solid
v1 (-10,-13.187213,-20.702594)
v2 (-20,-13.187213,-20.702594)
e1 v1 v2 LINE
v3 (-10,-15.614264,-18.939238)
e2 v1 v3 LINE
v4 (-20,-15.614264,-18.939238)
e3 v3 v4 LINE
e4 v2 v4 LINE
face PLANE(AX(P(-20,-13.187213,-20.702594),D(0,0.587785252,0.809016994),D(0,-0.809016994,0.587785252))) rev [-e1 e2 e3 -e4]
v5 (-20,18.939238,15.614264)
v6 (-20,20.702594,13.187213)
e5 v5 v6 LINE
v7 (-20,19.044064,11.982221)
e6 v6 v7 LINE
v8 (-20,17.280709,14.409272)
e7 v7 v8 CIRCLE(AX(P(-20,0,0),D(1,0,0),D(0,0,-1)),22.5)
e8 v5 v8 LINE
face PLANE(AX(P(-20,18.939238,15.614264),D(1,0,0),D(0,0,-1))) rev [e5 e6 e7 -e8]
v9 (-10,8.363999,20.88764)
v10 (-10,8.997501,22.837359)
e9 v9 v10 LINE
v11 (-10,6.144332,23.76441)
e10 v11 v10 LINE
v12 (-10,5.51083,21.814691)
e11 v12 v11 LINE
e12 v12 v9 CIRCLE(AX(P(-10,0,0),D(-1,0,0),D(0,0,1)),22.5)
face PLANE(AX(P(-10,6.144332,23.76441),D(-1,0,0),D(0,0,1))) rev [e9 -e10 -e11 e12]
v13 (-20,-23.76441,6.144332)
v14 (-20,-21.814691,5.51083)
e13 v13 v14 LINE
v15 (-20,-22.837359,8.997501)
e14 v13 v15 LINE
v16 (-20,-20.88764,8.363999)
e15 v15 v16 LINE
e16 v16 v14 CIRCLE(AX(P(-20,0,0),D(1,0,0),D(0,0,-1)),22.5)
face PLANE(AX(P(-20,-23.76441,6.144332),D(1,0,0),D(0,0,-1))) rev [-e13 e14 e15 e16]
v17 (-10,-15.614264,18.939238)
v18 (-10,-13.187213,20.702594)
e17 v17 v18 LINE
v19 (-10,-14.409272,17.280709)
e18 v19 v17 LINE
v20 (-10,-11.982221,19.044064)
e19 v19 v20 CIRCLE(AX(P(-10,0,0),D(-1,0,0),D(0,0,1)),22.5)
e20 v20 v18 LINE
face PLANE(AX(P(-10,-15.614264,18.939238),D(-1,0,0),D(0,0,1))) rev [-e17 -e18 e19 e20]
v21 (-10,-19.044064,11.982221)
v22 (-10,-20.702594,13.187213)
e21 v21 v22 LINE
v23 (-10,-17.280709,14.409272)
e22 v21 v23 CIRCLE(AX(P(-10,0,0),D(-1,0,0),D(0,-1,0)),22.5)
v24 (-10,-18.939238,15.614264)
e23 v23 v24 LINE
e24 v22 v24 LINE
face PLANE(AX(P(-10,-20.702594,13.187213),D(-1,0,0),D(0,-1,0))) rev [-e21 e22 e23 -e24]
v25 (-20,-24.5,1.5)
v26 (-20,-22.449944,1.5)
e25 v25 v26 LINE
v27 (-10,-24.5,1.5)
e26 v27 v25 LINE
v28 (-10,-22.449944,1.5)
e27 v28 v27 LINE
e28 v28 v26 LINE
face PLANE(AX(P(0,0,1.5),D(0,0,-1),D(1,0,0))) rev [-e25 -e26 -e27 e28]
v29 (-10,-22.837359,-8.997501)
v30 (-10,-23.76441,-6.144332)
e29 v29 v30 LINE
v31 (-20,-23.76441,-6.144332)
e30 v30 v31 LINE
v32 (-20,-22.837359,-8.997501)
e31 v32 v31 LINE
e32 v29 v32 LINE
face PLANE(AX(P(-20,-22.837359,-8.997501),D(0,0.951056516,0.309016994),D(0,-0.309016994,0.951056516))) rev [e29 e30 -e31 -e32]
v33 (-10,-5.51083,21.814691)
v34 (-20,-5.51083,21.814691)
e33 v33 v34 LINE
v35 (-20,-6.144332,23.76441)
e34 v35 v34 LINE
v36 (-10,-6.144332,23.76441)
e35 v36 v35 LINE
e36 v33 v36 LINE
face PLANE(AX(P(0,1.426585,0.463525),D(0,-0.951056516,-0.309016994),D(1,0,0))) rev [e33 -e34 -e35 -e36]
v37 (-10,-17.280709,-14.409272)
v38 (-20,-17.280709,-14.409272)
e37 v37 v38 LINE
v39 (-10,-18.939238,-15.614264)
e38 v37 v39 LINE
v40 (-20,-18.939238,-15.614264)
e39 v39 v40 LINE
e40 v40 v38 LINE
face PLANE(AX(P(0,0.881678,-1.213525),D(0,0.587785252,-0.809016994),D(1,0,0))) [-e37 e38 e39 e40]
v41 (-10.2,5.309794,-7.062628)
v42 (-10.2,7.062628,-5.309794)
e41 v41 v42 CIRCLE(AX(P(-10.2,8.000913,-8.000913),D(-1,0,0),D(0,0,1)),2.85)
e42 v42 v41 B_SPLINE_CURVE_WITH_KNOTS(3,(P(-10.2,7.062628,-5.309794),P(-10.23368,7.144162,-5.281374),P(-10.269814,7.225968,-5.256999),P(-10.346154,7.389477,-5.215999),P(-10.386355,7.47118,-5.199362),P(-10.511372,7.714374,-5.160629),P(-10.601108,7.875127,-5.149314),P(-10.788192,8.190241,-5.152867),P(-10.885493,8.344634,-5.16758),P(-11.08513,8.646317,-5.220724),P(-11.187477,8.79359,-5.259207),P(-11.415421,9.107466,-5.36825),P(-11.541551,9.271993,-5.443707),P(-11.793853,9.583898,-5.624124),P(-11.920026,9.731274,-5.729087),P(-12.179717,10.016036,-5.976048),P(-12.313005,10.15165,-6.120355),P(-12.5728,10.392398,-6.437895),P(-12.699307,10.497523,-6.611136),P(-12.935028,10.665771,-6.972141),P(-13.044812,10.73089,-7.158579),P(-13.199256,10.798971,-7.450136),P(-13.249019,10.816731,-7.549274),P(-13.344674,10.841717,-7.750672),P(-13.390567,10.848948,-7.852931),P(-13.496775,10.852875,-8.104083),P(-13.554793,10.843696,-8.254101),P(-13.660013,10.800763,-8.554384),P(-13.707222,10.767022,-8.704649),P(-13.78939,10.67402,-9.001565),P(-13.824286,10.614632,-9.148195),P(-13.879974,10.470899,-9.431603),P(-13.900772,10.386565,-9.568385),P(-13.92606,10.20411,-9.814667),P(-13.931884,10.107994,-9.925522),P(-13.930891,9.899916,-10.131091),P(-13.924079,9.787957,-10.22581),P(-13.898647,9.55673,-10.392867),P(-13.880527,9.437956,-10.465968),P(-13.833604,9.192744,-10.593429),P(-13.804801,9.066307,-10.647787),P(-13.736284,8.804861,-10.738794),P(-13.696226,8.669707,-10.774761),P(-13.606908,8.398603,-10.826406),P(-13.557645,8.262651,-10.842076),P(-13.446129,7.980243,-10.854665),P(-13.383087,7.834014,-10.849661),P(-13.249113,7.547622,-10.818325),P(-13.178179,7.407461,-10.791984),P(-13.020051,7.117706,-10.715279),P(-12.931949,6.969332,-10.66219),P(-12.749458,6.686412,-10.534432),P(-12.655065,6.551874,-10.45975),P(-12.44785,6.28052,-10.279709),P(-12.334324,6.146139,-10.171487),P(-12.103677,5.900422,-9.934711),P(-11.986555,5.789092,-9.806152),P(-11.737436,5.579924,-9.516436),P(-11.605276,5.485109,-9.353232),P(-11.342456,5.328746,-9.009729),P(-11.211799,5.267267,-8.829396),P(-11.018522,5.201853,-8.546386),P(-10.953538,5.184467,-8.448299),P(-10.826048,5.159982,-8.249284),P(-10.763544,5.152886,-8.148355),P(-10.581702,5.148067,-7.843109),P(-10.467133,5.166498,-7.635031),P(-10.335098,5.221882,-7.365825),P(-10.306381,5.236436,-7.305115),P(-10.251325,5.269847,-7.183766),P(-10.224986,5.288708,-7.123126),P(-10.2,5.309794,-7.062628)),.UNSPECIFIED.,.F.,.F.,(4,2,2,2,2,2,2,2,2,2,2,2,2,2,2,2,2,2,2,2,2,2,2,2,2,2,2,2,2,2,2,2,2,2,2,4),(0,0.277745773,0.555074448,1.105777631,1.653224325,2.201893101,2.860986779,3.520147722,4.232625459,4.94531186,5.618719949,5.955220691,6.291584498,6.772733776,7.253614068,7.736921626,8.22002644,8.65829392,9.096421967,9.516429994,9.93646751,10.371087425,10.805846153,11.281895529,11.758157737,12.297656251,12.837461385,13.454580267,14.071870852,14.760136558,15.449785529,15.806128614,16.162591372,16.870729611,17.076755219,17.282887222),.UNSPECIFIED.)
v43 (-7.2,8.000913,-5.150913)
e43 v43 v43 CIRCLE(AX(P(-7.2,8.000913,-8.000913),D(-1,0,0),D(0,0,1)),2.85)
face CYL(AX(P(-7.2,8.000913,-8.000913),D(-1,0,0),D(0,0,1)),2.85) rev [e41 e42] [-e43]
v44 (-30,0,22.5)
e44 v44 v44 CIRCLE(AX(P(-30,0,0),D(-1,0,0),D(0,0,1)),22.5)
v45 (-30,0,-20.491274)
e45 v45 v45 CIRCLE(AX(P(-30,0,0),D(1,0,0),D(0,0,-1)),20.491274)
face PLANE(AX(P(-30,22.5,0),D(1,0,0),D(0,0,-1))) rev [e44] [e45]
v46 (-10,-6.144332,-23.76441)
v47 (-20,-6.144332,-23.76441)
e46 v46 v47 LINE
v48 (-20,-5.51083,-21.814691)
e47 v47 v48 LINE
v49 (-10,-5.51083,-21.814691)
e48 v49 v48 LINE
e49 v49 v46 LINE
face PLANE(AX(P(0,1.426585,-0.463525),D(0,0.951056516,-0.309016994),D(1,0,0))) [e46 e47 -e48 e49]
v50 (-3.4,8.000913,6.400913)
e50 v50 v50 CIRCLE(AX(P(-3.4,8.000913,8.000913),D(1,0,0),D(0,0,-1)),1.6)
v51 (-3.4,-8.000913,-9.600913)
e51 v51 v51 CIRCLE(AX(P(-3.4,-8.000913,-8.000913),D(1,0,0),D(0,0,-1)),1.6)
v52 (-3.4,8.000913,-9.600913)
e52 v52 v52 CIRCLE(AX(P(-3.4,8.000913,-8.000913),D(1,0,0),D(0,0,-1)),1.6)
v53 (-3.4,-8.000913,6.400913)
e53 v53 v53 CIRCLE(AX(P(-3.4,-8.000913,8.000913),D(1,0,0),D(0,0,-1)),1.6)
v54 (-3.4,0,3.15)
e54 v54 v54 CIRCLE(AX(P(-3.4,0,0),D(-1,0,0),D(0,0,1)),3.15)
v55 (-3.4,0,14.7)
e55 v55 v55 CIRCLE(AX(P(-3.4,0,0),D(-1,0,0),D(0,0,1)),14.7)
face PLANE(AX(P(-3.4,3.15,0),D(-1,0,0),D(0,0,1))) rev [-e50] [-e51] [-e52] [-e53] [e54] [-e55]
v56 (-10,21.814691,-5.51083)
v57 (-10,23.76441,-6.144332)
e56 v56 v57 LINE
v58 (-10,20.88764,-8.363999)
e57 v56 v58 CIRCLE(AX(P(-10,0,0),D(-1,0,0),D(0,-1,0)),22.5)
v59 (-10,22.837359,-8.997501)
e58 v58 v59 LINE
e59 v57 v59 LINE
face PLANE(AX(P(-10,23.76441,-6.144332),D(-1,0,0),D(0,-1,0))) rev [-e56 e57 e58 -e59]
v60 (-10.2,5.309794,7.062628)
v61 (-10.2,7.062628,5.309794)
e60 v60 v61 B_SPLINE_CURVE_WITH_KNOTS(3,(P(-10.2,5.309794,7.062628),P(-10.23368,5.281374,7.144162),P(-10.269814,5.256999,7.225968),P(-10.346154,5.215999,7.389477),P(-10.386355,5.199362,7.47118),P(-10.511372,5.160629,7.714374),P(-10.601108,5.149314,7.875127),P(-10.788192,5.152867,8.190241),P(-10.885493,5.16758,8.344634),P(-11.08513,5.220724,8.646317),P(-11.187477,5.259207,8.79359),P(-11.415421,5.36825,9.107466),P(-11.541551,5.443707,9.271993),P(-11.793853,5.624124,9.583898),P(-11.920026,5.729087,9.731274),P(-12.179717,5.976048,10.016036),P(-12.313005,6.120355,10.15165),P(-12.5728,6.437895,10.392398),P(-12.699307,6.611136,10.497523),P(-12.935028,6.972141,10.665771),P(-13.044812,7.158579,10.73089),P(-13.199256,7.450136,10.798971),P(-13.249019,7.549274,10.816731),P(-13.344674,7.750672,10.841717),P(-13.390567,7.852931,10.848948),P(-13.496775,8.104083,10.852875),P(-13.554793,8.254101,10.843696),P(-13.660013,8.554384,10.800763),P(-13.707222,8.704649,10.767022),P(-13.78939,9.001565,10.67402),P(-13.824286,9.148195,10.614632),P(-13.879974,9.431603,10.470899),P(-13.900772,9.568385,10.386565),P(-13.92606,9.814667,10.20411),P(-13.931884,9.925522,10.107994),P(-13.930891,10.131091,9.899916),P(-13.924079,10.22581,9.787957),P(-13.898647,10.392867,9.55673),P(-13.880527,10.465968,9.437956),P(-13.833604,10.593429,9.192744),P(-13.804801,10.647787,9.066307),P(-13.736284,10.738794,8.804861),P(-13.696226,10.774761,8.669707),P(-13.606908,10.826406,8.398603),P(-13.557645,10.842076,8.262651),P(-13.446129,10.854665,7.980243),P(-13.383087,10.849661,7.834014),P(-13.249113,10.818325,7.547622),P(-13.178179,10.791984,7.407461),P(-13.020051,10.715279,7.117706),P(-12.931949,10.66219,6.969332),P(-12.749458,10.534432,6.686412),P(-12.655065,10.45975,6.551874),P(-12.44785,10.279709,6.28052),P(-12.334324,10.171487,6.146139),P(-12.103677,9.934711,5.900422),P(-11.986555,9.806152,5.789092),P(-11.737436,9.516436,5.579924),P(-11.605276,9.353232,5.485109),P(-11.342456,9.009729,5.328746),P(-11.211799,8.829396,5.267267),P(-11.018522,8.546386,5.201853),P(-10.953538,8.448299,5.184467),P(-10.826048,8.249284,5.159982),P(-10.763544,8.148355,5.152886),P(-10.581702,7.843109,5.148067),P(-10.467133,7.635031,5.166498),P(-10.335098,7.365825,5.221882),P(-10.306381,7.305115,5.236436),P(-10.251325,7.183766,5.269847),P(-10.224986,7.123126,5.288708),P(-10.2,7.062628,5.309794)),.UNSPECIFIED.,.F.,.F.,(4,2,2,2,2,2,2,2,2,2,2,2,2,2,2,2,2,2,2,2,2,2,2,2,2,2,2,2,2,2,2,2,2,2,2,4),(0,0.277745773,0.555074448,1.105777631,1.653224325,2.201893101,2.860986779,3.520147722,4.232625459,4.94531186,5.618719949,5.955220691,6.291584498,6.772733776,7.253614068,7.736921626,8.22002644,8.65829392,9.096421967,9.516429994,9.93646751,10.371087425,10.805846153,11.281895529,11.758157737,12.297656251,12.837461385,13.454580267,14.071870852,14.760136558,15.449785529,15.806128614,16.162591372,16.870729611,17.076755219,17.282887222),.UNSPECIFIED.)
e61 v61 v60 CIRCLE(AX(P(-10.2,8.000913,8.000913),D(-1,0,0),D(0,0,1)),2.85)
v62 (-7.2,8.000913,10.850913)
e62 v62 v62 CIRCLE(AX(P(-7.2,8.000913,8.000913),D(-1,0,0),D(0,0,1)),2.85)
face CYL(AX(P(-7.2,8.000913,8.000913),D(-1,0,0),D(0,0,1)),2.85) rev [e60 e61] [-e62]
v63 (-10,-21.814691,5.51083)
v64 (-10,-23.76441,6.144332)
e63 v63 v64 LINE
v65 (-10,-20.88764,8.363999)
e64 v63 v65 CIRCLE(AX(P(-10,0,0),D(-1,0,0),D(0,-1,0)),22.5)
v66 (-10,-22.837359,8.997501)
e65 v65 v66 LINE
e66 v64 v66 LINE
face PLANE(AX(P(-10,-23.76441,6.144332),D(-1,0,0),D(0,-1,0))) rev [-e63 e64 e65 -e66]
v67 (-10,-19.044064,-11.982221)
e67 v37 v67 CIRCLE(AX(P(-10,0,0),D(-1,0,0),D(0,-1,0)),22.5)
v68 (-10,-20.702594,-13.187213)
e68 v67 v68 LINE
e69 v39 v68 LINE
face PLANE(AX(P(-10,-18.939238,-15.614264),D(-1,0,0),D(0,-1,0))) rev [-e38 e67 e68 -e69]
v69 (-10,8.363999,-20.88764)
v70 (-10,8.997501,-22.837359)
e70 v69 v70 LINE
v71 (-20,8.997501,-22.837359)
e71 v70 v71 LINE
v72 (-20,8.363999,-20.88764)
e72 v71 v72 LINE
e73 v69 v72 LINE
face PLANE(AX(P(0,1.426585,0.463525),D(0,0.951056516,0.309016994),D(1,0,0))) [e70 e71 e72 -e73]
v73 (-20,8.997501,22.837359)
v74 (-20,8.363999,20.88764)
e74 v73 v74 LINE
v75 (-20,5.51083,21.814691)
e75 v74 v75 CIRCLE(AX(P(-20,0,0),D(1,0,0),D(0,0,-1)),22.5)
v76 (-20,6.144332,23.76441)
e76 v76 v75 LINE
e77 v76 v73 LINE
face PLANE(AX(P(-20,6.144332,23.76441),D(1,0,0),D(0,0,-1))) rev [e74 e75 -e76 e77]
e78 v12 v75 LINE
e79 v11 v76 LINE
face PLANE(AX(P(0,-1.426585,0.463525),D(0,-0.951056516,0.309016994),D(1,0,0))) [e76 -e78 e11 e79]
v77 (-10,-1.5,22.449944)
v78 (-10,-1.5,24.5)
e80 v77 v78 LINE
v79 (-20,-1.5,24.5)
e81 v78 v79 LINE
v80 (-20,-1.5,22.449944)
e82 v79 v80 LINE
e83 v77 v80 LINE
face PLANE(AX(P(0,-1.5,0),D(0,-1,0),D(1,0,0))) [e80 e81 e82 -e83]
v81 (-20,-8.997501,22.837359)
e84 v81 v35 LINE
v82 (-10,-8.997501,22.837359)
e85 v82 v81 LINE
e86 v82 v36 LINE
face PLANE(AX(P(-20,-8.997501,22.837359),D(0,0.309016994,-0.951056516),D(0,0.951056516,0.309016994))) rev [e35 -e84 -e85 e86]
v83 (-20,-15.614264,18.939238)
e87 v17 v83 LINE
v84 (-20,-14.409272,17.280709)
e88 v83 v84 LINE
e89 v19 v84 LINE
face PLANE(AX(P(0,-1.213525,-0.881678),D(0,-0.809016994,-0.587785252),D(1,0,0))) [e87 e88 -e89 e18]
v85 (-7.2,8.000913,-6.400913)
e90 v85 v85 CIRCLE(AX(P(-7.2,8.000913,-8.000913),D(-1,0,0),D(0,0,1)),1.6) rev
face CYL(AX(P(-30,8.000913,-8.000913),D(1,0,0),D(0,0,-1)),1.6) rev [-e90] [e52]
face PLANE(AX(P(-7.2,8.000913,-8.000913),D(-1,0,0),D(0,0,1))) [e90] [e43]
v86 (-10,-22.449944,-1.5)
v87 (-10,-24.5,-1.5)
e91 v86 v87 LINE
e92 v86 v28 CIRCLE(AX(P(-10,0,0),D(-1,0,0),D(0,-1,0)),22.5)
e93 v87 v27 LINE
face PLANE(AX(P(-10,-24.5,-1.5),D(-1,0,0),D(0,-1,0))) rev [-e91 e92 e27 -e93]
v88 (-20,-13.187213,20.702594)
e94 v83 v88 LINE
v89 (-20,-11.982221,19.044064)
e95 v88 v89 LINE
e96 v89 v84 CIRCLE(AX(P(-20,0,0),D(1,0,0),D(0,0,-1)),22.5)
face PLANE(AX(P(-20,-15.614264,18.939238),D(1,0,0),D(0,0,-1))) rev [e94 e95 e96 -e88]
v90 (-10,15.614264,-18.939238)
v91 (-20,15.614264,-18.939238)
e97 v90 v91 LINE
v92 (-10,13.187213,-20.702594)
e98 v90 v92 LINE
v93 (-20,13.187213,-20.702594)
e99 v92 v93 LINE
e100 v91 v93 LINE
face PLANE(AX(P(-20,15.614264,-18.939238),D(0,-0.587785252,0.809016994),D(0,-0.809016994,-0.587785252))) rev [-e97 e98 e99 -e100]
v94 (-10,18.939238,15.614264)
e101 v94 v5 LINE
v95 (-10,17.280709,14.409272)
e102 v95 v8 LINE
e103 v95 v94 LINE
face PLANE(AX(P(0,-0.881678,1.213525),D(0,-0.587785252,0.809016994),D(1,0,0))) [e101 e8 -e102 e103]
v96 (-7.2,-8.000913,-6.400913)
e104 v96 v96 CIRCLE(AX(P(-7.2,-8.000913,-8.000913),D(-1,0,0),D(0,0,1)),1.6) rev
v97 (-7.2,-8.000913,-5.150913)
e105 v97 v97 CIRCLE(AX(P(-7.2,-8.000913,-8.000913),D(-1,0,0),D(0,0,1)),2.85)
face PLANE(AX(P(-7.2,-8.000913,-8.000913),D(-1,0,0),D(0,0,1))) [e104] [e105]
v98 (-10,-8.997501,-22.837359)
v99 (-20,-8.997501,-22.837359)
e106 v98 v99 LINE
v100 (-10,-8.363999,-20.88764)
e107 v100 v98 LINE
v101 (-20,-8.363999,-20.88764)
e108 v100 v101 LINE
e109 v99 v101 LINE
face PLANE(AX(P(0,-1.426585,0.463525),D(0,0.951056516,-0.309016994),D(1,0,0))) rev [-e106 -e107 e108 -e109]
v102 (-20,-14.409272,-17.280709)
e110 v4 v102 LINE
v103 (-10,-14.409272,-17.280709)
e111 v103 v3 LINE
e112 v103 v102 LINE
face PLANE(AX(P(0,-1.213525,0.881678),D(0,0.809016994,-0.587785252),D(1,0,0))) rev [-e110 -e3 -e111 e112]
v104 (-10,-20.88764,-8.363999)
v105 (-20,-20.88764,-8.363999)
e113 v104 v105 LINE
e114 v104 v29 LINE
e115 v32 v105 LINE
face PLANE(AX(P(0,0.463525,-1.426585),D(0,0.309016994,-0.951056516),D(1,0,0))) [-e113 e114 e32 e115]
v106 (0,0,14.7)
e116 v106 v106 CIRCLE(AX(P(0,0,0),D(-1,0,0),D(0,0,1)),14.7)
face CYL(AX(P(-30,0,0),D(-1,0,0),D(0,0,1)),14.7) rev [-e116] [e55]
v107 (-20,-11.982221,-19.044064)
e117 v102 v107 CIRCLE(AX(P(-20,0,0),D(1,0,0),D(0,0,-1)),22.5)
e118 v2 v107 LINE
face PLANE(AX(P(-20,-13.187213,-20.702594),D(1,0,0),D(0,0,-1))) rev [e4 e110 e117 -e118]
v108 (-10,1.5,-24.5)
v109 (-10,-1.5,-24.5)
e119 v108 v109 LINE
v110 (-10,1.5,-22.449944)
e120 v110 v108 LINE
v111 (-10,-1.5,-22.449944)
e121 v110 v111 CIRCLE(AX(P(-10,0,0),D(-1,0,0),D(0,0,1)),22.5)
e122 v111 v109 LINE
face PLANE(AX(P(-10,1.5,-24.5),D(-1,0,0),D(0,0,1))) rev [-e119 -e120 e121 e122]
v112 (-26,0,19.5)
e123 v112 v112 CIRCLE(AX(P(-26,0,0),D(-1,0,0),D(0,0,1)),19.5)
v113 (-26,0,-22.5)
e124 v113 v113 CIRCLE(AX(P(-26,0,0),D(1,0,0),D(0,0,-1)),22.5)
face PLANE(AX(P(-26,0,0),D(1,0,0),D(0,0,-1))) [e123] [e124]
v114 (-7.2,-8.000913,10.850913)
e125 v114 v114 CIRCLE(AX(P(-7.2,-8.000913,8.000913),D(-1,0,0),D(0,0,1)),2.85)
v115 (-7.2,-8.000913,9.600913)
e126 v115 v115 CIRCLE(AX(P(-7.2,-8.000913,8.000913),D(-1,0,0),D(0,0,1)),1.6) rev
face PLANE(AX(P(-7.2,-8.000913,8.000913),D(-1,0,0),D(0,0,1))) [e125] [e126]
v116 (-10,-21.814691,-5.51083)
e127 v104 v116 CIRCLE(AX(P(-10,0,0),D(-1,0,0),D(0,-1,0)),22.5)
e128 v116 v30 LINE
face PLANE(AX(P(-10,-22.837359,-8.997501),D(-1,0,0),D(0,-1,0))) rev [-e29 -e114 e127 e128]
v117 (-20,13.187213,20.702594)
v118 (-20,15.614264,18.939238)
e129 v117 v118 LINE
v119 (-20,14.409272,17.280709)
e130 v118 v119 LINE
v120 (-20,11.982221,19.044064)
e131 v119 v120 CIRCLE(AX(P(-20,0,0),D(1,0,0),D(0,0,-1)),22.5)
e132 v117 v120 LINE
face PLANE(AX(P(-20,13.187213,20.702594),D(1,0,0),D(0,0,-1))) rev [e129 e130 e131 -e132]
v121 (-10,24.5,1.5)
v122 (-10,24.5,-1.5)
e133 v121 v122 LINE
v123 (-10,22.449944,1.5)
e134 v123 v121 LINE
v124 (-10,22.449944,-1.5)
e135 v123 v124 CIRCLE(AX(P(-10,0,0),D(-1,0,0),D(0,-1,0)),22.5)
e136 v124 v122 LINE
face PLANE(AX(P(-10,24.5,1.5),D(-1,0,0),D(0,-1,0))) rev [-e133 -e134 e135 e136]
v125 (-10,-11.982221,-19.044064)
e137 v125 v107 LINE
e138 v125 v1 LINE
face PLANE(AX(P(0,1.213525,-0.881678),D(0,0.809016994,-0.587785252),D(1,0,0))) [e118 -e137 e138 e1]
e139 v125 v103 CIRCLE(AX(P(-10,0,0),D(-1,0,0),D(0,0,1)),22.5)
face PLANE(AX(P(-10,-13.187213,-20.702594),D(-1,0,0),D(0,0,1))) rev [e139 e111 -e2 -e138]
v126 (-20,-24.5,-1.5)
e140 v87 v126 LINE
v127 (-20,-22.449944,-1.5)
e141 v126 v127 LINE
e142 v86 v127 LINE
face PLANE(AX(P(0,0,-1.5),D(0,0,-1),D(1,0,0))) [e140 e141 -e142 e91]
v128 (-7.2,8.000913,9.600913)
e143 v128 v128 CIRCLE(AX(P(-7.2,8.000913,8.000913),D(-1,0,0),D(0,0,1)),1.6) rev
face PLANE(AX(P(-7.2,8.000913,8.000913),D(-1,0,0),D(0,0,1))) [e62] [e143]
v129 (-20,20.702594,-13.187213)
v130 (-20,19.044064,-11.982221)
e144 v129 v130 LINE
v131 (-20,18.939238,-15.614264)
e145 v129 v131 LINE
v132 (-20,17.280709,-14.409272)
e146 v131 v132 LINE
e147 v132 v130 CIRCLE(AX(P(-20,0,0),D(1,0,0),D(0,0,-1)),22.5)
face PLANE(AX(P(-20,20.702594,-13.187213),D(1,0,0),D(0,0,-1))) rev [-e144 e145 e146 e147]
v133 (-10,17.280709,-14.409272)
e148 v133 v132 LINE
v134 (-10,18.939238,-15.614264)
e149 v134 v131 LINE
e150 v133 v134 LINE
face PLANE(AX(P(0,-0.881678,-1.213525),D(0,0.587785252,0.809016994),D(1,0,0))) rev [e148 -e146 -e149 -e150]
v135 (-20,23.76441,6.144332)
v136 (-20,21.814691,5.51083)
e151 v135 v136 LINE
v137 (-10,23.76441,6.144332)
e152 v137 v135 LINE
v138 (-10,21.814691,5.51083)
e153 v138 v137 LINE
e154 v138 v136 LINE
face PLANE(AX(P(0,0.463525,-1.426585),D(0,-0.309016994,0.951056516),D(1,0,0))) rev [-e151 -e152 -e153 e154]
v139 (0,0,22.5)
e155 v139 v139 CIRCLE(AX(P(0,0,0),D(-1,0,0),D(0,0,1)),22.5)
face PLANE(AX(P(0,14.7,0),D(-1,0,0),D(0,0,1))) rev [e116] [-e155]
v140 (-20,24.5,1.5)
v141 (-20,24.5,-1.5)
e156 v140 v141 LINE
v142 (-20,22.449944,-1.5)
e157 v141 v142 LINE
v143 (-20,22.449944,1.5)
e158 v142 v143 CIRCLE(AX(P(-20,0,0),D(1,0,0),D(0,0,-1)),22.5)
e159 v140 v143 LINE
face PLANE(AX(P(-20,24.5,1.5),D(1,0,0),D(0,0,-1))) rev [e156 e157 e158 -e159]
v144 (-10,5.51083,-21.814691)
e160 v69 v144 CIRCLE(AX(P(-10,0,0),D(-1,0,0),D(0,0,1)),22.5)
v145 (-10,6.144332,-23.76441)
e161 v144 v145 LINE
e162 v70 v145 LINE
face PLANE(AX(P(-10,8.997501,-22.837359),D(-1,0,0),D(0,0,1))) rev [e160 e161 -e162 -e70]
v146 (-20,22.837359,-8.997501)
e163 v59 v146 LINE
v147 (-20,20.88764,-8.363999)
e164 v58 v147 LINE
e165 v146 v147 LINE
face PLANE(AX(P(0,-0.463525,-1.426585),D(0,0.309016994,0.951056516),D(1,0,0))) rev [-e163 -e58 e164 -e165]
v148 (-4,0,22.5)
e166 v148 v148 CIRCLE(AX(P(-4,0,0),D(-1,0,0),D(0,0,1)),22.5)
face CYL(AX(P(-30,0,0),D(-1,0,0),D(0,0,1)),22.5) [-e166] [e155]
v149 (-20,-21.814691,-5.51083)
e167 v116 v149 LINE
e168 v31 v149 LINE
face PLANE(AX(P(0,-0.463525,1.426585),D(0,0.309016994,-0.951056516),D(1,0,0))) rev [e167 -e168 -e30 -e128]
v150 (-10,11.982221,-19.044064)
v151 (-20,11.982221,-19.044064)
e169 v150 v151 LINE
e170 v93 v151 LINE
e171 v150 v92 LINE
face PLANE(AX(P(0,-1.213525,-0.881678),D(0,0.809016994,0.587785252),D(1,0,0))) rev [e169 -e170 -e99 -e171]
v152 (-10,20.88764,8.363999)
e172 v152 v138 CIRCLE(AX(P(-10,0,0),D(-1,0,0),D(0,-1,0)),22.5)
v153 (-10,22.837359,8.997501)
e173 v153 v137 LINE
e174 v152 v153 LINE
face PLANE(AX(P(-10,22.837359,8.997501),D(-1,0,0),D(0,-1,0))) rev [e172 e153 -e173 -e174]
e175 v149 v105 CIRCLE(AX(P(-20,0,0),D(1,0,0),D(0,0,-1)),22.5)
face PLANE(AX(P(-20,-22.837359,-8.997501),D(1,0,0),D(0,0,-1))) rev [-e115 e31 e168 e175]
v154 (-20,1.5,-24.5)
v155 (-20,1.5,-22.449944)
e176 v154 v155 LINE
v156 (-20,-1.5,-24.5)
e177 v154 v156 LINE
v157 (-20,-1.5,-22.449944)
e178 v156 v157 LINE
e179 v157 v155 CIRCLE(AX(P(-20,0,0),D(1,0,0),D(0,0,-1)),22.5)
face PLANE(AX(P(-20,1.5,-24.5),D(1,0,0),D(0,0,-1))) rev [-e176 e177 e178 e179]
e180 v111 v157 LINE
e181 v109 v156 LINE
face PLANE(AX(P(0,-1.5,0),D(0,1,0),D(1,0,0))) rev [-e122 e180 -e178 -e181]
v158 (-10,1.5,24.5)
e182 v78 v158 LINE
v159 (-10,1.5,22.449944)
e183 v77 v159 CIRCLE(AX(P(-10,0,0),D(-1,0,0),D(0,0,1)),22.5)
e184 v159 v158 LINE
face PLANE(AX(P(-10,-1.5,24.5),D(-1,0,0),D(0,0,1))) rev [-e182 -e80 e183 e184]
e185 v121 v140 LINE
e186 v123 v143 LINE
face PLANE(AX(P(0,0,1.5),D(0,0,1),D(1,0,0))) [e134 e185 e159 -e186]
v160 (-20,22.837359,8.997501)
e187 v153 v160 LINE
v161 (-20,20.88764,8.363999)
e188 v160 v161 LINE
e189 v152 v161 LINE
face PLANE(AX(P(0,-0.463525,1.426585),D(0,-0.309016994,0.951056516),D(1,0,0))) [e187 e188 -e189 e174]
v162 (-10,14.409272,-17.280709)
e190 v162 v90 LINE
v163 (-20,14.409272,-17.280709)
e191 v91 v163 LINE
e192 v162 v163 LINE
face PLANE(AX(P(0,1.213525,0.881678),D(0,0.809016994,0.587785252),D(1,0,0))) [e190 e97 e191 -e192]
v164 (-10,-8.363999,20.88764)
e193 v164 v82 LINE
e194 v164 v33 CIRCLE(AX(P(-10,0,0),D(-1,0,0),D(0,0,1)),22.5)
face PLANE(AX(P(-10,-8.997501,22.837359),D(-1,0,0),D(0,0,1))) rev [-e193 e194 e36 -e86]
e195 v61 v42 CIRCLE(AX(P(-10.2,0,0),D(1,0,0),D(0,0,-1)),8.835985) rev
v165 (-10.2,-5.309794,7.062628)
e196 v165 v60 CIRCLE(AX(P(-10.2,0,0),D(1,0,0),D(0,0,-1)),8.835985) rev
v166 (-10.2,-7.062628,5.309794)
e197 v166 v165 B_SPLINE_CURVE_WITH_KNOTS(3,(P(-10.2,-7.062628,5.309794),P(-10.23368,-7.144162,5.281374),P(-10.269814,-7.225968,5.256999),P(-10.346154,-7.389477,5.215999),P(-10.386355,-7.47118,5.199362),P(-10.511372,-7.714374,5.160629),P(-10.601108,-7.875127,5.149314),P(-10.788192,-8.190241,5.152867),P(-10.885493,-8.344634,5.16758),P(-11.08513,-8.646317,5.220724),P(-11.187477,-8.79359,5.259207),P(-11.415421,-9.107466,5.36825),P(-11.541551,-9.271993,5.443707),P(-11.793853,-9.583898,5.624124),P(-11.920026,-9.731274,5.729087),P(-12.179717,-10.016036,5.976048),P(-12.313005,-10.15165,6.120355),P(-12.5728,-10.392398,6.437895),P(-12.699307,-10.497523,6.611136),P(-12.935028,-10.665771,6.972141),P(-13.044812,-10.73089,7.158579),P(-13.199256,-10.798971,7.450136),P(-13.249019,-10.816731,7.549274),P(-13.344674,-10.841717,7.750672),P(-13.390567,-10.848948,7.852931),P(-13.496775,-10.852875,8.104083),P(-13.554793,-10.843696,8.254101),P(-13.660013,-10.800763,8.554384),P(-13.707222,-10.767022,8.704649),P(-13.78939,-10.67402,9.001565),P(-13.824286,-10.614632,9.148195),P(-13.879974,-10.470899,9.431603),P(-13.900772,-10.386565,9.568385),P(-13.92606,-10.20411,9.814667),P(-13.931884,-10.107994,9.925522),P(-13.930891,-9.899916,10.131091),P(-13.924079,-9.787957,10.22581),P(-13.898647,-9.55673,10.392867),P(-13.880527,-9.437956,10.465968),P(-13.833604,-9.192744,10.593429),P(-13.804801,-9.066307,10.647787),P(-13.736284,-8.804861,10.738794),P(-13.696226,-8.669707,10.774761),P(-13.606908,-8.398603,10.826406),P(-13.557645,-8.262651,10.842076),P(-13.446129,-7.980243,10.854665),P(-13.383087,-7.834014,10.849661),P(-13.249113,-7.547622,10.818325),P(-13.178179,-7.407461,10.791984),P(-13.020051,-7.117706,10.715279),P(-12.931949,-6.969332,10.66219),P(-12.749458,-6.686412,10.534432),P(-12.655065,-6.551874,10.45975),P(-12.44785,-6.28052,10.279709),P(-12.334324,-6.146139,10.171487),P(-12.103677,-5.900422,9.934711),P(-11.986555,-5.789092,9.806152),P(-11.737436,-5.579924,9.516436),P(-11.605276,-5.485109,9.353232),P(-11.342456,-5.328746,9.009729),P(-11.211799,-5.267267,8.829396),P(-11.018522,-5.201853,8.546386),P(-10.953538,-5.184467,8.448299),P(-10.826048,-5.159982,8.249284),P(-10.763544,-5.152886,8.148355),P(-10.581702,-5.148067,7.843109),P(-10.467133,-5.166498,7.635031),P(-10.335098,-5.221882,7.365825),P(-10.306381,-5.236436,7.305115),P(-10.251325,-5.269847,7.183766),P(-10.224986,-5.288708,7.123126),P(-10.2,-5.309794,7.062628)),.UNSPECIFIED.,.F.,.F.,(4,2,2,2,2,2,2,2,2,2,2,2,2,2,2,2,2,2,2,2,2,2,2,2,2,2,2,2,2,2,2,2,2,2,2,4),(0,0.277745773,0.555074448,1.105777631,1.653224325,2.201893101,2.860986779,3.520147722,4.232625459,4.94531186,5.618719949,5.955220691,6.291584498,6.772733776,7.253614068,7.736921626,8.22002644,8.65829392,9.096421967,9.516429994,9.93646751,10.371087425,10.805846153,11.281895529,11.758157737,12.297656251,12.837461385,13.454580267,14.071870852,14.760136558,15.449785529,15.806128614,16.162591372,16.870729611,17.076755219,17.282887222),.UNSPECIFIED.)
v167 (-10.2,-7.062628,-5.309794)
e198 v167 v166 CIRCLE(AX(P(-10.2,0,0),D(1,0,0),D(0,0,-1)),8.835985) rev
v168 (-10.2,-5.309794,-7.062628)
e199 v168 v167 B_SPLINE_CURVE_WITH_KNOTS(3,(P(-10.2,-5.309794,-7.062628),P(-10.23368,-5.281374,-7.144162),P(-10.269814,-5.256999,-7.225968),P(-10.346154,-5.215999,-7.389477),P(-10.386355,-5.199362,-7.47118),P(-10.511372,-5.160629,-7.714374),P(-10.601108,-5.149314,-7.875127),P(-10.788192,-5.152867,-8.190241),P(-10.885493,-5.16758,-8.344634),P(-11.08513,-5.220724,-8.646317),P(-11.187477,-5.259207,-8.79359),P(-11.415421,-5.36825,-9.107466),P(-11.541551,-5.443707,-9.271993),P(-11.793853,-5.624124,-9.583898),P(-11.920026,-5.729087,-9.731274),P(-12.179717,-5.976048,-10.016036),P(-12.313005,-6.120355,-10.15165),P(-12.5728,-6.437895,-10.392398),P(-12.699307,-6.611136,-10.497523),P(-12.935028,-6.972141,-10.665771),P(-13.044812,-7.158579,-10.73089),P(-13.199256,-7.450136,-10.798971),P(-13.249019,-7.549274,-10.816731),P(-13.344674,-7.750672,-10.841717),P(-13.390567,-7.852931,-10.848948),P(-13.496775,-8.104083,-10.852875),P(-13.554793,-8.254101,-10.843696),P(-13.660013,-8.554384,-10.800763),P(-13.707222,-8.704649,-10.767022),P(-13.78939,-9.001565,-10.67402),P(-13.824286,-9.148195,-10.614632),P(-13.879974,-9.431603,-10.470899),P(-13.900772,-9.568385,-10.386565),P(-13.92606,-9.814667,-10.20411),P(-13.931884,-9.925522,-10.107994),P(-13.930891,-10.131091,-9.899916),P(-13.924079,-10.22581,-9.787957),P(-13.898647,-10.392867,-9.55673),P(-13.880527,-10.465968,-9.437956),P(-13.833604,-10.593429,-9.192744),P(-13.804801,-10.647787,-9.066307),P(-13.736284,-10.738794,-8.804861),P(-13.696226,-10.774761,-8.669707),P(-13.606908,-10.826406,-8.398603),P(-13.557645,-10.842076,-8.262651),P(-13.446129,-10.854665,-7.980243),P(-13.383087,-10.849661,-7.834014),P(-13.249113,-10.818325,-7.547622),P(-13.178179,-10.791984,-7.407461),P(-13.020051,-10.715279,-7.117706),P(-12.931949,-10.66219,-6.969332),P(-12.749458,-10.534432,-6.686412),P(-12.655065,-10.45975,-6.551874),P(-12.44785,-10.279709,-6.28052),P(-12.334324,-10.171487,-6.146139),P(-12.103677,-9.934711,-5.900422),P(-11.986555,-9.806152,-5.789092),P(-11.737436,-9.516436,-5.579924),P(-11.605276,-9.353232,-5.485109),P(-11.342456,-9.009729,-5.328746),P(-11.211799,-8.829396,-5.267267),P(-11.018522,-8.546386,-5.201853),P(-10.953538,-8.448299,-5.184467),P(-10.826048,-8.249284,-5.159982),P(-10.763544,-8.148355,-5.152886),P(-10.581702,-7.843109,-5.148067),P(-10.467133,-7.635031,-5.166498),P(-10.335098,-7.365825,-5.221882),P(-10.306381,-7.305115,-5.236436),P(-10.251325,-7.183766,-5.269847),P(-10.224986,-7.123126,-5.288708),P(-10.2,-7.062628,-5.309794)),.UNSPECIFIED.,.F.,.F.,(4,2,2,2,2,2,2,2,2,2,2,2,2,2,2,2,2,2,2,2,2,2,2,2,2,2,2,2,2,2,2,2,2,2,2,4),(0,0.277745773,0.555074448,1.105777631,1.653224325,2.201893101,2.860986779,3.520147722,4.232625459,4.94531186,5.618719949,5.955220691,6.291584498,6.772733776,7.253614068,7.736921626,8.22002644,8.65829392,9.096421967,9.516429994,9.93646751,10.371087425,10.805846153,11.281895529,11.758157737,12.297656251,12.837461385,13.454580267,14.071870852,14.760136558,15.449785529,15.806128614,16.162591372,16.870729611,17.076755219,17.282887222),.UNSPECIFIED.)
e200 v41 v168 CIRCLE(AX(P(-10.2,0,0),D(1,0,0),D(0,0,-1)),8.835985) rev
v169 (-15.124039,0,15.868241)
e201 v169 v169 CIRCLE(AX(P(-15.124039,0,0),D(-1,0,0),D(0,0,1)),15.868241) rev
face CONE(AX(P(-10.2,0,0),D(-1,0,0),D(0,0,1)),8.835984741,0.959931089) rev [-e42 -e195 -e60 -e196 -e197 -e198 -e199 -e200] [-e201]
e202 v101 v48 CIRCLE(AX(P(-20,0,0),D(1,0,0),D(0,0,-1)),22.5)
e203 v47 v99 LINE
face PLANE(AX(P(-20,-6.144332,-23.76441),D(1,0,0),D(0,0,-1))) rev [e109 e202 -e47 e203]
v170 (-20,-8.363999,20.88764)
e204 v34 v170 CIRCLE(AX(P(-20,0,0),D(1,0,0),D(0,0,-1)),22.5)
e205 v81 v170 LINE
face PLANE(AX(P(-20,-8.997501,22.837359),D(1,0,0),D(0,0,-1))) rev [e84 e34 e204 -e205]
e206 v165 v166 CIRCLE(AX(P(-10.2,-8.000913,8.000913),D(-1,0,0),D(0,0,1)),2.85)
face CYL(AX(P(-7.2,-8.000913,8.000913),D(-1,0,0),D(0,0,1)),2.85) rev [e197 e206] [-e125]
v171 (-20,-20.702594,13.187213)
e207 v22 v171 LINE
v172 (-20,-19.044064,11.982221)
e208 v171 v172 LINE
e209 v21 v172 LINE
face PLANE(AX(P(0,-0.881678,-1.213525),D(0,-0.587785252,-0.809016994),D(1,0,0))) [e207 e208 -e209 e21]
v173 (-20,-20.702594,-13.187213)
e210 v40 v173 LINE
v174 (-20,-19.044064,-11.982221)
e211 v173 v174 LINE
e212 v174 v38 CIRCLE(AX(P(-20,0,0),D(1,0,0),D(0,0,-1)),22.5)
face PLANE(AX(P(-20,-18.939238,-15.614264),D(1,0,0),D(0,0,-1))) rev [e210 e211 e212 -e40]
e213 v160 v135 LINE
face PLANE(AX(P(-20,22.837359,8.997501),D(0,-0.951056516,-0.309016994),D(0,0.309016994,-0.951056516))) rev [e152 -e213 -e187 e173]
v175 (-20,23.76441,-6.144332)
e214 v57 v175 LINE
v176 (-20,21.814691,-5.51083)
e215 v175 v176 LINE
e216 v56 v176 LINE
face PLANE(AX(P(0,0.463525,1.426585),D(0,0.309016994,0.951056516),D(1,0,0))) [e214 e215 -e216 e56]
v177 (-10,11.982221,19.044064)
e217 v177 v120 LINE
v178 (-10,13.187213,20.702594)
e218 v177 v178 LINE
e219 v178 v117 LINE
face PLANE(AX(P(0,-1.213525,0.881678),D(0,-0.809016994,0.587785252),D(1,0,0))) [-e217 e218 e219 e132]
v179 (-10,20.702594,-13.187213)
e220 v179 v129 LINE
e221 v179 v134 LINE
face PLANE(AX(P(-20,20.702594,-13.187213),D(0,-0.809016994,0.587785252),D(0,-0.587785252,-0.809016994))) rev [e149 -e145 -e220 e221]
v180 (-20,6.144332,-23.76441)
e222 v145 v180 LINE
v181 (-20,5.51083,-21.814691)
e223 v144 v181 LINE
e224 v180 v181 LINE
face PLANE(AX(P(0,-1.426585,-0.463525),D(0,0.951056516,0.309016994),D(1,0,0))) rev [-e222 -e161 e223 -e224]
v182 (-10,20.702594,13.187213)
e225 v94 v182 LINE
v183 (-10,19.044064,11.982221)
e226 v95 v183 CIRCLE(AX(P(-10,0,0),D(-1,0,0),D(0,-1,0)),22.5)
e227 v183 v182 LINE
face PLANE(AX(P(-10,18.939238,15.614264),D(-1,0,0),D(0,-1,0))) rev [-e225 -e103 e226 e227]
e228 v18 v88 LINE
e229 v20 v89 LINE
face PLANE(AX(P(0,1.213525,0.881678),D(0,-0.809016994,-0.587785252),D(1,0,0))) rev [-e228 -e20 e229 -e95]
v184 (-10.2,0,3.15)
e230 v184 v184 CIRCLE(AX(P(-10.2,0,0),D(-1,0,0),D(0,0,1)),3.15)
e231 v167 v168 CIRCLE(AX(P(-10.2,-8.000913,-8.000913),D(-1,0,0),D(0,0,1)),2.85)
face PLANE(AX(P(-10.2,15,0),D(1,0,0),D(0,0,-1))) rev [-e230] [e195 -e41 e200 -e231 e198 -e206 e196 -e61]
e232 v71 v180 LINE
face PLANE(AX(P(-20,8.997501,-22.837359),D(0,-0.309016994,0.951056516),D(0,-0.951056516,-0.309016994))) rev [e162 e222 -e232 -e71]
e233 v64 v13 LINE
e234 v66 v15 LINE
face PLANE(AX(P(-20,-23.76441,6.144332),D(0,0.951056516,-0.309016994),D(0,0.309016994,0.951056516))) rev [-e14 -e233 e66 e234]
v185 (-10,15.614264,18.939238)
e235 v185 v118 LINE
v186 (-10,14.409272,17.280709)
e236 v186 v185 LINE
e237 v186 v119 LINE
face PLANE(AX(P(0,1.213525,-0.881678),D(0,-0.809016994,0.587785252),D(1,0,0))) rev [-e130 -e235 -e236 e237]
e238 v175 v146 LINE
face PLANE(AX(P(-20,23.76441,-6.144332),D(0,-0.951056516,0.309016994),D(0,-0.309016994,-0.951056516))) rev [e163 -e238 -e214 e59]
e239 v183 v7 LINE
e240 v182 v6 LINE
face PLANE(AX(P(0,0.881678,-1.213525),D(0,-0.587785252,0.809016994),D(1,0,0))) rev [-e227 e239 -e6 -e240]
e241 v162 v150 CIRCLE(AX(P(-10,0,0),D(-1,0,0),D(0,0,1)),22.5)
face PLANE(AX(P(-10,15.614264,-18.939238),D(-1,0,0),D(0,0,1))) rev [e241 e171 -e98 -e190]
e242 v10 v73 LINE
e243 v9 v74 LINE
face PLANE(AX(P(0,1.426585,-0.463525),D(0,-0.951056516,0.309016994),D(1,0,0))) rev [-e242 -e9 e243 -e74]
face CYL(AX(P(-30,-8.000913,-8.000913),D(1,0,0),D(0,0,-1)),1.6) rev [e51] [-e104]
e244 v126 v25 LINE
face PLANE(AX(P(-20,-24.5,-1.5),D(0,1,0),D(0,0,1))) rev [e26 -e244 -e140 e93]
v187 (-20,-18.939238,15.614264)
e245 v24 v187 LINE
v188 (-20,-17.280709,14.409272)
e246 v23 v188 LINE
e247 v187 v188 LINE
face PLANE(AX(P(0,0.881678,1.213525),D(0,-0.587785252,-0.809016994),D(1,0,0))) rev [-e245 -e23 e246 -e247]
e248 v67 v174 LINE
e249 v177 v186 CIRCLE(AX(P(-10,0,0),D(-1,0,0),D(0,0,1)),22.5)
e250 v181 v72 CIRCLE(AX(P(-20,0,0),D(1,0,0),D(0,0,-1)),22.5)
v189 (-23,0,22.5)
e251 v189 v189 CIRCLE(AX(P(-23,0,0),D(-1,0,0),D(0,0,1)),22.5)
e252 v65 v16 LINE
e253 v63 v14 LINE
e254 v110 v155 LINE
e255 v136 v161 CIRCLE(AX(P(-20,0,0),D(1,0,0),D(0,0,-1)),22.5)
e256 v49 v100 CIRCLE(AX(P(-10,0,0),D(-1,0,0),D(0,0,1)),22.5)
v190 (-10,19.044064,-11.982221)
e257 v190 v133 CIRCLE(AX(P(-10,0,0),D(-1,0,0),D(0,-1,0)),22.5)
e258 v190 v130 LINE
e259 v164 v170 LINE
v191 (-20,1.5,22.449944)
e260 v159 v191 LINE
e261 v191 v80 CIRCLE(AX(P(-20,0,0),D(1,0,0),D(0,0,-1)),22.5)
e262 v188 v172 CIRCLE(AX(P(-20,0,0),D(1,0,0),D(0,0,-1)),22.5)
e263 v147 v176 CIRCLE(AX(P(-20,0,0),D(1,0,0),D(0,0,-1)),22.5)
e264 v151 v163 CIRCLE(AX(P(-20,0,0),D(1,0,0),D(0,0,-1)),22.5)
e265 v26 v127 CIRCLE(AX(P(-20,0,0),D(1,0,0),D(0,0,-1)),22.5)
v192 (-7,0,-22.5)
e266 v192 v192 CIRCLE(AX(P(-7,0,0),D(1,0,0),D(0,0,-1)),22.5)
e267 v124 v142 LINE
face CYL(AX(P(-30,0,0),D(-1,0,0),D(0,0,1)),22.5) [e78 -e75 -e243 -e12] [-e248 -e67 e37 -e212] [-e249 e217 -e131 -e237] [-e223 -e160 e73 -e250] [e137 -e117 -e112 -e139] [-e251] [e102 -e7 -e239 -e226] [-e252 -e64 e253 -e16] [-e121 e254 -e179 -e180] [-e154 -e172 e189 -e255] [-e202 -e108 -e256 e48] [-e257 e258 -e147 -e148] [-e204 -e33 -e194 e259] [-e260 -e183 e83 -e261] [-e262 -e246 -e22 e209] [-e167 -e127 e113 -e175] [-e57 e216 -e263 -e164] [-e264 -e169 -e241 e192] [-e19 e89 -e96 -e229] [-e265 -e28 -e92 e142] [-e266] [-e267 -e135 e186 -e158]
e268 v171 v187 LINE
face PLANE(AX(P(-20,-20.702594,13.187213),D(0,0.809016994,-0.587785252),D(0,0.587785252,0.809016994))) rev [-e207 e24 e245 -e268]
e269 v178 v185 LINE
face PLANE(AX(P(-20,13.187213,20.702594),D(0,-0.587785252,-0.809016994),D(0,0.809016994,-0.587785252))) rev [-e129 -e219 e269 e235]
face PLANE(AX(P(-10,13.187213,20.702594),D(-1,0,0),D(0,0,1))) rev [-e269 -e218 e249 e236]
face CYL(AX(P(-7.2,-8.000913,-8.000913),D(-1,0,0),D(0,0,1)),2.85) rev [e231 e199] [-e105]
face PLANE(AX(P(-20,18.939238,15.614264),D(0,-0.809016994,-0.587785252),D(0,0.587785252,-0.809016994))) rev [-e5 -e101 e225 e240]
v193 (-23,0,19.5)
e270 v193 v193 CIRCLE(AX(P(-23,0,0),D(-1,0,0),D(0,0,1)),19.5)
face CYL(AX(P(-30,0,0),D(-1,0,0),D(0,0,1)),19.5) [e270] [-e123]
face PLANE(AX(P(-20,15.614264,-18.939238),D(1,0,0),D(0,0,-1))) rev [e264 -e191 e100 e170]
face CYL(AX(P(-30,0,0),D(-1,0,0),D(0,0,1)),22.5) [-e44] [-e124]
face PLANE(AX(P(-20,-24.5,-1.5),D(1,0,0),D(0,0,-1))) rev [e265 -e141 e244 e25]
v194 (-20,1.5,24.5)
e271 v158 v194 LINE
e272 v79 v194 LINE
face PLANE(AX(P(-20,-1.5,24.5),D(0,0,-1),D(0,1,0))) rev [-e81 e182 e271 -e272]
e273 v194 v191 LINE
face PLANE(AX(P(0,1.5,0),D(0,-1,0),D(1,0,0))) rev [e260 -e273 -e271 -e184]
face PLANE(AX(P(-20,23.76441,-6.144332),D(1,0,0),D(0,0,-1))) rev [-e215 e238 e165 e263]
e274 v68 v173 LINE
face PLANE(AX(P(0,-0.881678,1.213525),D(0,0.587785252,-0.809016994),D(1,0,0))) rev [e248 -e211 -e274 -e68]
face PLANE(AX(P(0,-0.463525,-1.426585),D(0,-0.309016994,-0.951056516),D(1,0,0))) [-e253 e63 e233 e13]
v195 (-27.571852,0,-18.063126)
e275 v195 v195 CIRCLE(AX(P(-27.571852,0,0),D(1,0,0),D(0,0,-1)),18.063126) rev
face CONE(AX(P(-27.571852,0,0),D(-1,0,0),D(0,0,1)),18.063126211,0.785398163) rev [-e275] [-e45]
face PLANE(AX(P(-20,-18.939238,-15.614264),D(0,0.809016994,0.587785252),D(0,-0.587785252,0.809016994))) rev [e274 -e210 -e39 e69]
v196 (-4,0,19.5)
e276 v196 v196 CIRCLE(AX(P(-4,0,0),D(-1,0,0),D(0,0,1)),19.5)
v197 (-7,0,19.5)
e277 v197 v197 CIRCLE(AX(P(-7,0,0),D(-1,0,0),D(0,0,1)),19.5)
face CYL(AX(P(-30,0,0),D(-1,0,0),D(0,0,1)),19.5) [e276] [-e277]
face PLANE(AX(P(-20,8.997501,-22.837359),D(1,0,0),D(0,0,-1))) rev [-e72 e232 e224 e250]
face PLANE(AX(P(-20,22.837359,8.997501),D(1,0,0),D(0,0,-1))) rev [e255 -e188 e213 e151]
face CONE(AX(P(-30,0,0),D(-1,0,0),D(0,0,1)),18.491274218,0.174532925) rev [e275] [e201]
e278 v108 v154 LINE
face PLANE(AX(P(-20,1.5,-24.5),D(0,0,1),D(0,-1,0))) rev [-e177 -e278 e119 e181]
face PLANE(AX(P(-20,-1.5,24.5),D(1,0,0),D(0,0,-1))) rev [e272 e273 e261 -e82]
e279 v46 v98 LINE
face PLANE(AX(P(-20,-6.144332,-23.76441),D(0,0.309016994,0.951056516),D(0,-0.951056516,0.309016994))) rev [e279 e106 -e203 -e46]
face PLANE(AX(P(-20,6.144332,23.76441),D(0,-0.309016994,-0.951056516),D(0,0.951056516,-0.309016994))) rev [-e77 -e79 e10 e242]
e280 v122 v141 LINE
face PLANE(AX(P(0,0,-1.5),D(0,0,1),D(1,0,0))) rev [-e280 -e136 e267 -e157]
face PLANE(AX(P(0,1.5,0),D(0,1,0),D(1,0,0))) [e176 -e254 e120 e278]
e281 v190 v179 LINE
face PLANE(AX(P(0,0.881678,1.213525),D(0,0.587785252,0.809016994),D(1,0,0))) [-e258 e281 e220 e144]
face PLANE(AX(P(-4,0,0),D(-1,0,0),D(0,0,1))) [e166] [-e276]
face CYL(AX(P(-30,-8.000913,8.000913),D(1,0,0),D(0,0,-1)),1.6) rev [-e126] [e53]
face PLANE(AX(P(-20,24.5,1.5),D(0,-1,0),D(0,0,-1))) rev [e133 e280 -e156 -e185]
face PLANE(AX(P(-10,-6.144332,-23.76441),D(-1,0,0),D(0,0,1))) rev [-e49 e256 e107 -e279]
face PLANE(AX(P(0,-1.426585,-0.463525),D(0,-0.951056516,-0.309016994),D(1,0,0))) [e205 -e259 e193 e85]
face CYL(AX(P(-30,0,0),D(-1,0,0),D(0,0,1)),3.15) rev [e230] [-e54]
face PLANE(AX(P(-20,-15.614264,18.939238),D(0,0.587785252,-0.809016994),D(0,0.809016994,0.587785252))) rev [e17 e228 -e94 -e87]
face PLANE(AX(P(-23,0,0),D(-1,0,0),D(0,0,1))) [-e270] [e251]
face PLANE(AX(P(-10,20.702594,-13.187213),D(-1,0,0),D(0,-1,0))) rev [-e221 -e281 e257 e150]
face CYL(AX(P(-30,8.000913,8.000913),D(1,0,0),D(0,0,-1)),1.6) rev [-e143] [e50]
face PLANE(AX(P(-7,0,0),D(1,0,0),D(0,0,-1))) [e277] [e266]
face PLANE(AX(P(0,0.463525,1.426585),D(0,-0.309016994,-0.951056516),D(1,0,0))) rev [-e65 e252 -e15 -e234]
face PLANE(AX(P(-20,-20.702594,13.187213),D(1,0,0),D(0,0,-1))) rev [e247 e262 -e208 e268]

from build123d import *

# Parameters (mm, degrees)
SKETCH_5_R               = 1.6
CUT_EXTRUDE_1_DEPTH      = 42.473606065
SKETCH_6_R               = 2.85
CUT_EXTRUDE_2_DEPTH      = 3
CHAMFER_1_SIZE           = 5
CHAMFER_1_SIZE_2         = 6.164015259
CHAMFER_2_SIZE           = 2
CHAMFER_2_SIZE2          = 2.465606104
SKETCH_8_W               = 3
SKETCH_8_H               = 4
SKETCH_56_W              = 10
SKETCH_56_H              = 3.522984106
EXTRUDE_2_DEPTH          = 1.5
PATTERN_CIRCULAR_2_COUNT = 20


with BuildPart() as part:
    # Эскиз4 → Повернуть1 (revolve)
    with BuildSketch(Plane.XY, mode=Mode.PRIVATE) as revolve_1_sk:
        Polygon((-30, 22.5), (-30, 18.491274218), (-10.2, 15), (-10.2, 3.15), (-3.4, 3.15), (-3.4, 14.7), (0, 14.7), (0, 22.5), align=None)
    revolve(revolve_1_sk.sketch.rotate(Axis((-30, 0, 0), (1, 0, 0)), 90), axis=Axis((-30, 0, 0), (1, 0, 0)))

    # Эскиз5 → Вырез-Вытянуть1 (cut, through all)
    with BuildSketch(Plane(origin=(-3.4, 0, 0), x_dir=(0, 0, -1), z_dir=(1, 0, 0))):
        with Locations((8.000913229, 8.000913229)):
            Circle(SKETCH_5_R)
        with Locations((-8.000913229, 8.000913229)):
            Circle(SKETCH_5_R)
        with Locations((-8.000913229, -8.000913229)):
            Circle(SKETCH_5_R)
        with Locations((8.000913229, -8.000913229)):
            Circle(SKETCH_5_R)
    extrude(amount=-CUT_EXTRUDE_1_DEPTH, mode=Mode.SUBTRACT)

    # Эскиз6 → Вырез-Вытянуть2 (cut)
    with BuildSketch(Plane.ZY.offset(10.2)):
        with Locations((-8.000913229, 8.000913229)):
            Circle(SKETCH_6_R)
        with Locations((8.000913229, 8.000913229)):
            Circle(SKETCH_6_R)
        with Locations((8.000913229, -8.000913229)):
            Circle(SKETCH_6_R)
        with Locations((-8.000913229, -8.000913229)):
            Circle(SKETCH_6_R)
    extrude(amount=-CUT_EXTRUDE_2_DEPTH, mode=Mode.SUBTRACT)

    # Фаска1
    # the kernel refuses this chamfer: 6.164015259, 5 mm, written as the material it adds along each edge
    with BuildSketch(Plane(origin=(-10.2, 0, 0), x_dir=(0, 0, 1), z_dir=(0, 1, 0))) as chamfer_1_piece_1_section:
        Polygon((15 + CHAMFER_1_SIZE * 0.173648177667, -CHAMFER_1_SIZE * 0.984807753012), (15 - CHAMFER_1_SIZE_2, 0), (15, 0), align=None)
    chamfer_1_piece_1 = revolve(axis=Axis((-10.2, 0, 0), (1, 0, 0)), mode=Mode.PRIVATE)
    chamfer_1_piece_1 = chamfer_1_piece_1 - Plane(origin=(-12.574838132, 8.000913229, -8.000913229), x_dir=(0, 0, 1), z_dir=(-1, 0, 0)) * Cylinder(2.85, 64, mode=Mode.PRIVATE)
    chamfer_1_piece_1 = chamfer_1_piece_1 - Plane(origin=(-12.574838132, 8.000913229, 8.000913229), x_dir=(0, 0, 1), z_dir=(-1, 0, 0)) * Cylinder(2.85, 64, mode=Mode.PRIVATE)
    chamfer_1_piece_1 = chamfer_1_piece_1 - Plane(origin=(-12.574838132, -8.000913229, -8.000913229), x_dir=(0, 0, 1), z_dir=(-1, 0, 0)) * Cylinder(2.85, 64, mode=Mode.PRIVATE)
    chamfer_1_piece_1 = chamfer_1_piece_1 - Plane(origin=(-12.574838132, -8.000913229, 8.000913229), x_dir=(0, 0, 1), z_dir=(-1, 0, 0)) * Cylinder(2.85, 64, mode=Mode.PRIVATE)
    add(chamfer_1_piece_1)

    # Фаска2
    chamfer_2_edges = [part.edges().sort_by_distance(p)[0] for p in [
        (-30, 0, -18.491274218),
    ]]
    chamfer_2_side = [part.faces().sort_by_distance(p)[0] for p in [
        (-30, 0, -21.863603897),
    ]]
    chamfer(chamfer_2_edges, length=CHAMFER_2_SIZE, length2=CHAMFER_2_SIZE2, reference=chamfer_2_side[0])

    # Эскиз8 → Вырез-Повернуть1 (revolve, cut)
    with BuildSketch(Plane.XY, mode=Mode.PRIVATE) as cut_revolve_1_sk:
        with Locations((-24.5, 21.5)):
            Rectangle(SKETCH_8_W, SKETCH_8_H)
        with Locations((-5.5, 21.5)):
            Rectangle(SKETCH_8_W, SKETCH_8_H)
    revolve(cut_revolve_1_sk.sketch.rotate(Axis((-30, 0, 0), (1, 0, 0)), 90), axis=Axis((-30, 0, 0), (1, 0, 0)), mode=Mode.SUBTRACT)

    # Эскиз56 → Бобышка-Вытянуть2 (add, symmetric)
    with BuildSketch(Plane.XY):
        with Locations((-15, 22.738507947)):
            Rectangle(SKETCH_56_W, SKETCH_56_H)
    extrude_2 = extrude(amount=EXTRUDE_2_DEPTH, both=True)

    # Круговой массив2: Бобышка-Вытянуть2 ×20 about axis
    pattern_circular_2_axis = Axis((0, 0, 0), (1, 0, 0))
    for i in range(1, PATTERN_CIRCULAR_2_COUNT):
        add(extrude_2.rotate(pattern_circular_2_axis, i * 360 / PATTERN_CIRCULAR_2_COUNT))


solid = part.part
